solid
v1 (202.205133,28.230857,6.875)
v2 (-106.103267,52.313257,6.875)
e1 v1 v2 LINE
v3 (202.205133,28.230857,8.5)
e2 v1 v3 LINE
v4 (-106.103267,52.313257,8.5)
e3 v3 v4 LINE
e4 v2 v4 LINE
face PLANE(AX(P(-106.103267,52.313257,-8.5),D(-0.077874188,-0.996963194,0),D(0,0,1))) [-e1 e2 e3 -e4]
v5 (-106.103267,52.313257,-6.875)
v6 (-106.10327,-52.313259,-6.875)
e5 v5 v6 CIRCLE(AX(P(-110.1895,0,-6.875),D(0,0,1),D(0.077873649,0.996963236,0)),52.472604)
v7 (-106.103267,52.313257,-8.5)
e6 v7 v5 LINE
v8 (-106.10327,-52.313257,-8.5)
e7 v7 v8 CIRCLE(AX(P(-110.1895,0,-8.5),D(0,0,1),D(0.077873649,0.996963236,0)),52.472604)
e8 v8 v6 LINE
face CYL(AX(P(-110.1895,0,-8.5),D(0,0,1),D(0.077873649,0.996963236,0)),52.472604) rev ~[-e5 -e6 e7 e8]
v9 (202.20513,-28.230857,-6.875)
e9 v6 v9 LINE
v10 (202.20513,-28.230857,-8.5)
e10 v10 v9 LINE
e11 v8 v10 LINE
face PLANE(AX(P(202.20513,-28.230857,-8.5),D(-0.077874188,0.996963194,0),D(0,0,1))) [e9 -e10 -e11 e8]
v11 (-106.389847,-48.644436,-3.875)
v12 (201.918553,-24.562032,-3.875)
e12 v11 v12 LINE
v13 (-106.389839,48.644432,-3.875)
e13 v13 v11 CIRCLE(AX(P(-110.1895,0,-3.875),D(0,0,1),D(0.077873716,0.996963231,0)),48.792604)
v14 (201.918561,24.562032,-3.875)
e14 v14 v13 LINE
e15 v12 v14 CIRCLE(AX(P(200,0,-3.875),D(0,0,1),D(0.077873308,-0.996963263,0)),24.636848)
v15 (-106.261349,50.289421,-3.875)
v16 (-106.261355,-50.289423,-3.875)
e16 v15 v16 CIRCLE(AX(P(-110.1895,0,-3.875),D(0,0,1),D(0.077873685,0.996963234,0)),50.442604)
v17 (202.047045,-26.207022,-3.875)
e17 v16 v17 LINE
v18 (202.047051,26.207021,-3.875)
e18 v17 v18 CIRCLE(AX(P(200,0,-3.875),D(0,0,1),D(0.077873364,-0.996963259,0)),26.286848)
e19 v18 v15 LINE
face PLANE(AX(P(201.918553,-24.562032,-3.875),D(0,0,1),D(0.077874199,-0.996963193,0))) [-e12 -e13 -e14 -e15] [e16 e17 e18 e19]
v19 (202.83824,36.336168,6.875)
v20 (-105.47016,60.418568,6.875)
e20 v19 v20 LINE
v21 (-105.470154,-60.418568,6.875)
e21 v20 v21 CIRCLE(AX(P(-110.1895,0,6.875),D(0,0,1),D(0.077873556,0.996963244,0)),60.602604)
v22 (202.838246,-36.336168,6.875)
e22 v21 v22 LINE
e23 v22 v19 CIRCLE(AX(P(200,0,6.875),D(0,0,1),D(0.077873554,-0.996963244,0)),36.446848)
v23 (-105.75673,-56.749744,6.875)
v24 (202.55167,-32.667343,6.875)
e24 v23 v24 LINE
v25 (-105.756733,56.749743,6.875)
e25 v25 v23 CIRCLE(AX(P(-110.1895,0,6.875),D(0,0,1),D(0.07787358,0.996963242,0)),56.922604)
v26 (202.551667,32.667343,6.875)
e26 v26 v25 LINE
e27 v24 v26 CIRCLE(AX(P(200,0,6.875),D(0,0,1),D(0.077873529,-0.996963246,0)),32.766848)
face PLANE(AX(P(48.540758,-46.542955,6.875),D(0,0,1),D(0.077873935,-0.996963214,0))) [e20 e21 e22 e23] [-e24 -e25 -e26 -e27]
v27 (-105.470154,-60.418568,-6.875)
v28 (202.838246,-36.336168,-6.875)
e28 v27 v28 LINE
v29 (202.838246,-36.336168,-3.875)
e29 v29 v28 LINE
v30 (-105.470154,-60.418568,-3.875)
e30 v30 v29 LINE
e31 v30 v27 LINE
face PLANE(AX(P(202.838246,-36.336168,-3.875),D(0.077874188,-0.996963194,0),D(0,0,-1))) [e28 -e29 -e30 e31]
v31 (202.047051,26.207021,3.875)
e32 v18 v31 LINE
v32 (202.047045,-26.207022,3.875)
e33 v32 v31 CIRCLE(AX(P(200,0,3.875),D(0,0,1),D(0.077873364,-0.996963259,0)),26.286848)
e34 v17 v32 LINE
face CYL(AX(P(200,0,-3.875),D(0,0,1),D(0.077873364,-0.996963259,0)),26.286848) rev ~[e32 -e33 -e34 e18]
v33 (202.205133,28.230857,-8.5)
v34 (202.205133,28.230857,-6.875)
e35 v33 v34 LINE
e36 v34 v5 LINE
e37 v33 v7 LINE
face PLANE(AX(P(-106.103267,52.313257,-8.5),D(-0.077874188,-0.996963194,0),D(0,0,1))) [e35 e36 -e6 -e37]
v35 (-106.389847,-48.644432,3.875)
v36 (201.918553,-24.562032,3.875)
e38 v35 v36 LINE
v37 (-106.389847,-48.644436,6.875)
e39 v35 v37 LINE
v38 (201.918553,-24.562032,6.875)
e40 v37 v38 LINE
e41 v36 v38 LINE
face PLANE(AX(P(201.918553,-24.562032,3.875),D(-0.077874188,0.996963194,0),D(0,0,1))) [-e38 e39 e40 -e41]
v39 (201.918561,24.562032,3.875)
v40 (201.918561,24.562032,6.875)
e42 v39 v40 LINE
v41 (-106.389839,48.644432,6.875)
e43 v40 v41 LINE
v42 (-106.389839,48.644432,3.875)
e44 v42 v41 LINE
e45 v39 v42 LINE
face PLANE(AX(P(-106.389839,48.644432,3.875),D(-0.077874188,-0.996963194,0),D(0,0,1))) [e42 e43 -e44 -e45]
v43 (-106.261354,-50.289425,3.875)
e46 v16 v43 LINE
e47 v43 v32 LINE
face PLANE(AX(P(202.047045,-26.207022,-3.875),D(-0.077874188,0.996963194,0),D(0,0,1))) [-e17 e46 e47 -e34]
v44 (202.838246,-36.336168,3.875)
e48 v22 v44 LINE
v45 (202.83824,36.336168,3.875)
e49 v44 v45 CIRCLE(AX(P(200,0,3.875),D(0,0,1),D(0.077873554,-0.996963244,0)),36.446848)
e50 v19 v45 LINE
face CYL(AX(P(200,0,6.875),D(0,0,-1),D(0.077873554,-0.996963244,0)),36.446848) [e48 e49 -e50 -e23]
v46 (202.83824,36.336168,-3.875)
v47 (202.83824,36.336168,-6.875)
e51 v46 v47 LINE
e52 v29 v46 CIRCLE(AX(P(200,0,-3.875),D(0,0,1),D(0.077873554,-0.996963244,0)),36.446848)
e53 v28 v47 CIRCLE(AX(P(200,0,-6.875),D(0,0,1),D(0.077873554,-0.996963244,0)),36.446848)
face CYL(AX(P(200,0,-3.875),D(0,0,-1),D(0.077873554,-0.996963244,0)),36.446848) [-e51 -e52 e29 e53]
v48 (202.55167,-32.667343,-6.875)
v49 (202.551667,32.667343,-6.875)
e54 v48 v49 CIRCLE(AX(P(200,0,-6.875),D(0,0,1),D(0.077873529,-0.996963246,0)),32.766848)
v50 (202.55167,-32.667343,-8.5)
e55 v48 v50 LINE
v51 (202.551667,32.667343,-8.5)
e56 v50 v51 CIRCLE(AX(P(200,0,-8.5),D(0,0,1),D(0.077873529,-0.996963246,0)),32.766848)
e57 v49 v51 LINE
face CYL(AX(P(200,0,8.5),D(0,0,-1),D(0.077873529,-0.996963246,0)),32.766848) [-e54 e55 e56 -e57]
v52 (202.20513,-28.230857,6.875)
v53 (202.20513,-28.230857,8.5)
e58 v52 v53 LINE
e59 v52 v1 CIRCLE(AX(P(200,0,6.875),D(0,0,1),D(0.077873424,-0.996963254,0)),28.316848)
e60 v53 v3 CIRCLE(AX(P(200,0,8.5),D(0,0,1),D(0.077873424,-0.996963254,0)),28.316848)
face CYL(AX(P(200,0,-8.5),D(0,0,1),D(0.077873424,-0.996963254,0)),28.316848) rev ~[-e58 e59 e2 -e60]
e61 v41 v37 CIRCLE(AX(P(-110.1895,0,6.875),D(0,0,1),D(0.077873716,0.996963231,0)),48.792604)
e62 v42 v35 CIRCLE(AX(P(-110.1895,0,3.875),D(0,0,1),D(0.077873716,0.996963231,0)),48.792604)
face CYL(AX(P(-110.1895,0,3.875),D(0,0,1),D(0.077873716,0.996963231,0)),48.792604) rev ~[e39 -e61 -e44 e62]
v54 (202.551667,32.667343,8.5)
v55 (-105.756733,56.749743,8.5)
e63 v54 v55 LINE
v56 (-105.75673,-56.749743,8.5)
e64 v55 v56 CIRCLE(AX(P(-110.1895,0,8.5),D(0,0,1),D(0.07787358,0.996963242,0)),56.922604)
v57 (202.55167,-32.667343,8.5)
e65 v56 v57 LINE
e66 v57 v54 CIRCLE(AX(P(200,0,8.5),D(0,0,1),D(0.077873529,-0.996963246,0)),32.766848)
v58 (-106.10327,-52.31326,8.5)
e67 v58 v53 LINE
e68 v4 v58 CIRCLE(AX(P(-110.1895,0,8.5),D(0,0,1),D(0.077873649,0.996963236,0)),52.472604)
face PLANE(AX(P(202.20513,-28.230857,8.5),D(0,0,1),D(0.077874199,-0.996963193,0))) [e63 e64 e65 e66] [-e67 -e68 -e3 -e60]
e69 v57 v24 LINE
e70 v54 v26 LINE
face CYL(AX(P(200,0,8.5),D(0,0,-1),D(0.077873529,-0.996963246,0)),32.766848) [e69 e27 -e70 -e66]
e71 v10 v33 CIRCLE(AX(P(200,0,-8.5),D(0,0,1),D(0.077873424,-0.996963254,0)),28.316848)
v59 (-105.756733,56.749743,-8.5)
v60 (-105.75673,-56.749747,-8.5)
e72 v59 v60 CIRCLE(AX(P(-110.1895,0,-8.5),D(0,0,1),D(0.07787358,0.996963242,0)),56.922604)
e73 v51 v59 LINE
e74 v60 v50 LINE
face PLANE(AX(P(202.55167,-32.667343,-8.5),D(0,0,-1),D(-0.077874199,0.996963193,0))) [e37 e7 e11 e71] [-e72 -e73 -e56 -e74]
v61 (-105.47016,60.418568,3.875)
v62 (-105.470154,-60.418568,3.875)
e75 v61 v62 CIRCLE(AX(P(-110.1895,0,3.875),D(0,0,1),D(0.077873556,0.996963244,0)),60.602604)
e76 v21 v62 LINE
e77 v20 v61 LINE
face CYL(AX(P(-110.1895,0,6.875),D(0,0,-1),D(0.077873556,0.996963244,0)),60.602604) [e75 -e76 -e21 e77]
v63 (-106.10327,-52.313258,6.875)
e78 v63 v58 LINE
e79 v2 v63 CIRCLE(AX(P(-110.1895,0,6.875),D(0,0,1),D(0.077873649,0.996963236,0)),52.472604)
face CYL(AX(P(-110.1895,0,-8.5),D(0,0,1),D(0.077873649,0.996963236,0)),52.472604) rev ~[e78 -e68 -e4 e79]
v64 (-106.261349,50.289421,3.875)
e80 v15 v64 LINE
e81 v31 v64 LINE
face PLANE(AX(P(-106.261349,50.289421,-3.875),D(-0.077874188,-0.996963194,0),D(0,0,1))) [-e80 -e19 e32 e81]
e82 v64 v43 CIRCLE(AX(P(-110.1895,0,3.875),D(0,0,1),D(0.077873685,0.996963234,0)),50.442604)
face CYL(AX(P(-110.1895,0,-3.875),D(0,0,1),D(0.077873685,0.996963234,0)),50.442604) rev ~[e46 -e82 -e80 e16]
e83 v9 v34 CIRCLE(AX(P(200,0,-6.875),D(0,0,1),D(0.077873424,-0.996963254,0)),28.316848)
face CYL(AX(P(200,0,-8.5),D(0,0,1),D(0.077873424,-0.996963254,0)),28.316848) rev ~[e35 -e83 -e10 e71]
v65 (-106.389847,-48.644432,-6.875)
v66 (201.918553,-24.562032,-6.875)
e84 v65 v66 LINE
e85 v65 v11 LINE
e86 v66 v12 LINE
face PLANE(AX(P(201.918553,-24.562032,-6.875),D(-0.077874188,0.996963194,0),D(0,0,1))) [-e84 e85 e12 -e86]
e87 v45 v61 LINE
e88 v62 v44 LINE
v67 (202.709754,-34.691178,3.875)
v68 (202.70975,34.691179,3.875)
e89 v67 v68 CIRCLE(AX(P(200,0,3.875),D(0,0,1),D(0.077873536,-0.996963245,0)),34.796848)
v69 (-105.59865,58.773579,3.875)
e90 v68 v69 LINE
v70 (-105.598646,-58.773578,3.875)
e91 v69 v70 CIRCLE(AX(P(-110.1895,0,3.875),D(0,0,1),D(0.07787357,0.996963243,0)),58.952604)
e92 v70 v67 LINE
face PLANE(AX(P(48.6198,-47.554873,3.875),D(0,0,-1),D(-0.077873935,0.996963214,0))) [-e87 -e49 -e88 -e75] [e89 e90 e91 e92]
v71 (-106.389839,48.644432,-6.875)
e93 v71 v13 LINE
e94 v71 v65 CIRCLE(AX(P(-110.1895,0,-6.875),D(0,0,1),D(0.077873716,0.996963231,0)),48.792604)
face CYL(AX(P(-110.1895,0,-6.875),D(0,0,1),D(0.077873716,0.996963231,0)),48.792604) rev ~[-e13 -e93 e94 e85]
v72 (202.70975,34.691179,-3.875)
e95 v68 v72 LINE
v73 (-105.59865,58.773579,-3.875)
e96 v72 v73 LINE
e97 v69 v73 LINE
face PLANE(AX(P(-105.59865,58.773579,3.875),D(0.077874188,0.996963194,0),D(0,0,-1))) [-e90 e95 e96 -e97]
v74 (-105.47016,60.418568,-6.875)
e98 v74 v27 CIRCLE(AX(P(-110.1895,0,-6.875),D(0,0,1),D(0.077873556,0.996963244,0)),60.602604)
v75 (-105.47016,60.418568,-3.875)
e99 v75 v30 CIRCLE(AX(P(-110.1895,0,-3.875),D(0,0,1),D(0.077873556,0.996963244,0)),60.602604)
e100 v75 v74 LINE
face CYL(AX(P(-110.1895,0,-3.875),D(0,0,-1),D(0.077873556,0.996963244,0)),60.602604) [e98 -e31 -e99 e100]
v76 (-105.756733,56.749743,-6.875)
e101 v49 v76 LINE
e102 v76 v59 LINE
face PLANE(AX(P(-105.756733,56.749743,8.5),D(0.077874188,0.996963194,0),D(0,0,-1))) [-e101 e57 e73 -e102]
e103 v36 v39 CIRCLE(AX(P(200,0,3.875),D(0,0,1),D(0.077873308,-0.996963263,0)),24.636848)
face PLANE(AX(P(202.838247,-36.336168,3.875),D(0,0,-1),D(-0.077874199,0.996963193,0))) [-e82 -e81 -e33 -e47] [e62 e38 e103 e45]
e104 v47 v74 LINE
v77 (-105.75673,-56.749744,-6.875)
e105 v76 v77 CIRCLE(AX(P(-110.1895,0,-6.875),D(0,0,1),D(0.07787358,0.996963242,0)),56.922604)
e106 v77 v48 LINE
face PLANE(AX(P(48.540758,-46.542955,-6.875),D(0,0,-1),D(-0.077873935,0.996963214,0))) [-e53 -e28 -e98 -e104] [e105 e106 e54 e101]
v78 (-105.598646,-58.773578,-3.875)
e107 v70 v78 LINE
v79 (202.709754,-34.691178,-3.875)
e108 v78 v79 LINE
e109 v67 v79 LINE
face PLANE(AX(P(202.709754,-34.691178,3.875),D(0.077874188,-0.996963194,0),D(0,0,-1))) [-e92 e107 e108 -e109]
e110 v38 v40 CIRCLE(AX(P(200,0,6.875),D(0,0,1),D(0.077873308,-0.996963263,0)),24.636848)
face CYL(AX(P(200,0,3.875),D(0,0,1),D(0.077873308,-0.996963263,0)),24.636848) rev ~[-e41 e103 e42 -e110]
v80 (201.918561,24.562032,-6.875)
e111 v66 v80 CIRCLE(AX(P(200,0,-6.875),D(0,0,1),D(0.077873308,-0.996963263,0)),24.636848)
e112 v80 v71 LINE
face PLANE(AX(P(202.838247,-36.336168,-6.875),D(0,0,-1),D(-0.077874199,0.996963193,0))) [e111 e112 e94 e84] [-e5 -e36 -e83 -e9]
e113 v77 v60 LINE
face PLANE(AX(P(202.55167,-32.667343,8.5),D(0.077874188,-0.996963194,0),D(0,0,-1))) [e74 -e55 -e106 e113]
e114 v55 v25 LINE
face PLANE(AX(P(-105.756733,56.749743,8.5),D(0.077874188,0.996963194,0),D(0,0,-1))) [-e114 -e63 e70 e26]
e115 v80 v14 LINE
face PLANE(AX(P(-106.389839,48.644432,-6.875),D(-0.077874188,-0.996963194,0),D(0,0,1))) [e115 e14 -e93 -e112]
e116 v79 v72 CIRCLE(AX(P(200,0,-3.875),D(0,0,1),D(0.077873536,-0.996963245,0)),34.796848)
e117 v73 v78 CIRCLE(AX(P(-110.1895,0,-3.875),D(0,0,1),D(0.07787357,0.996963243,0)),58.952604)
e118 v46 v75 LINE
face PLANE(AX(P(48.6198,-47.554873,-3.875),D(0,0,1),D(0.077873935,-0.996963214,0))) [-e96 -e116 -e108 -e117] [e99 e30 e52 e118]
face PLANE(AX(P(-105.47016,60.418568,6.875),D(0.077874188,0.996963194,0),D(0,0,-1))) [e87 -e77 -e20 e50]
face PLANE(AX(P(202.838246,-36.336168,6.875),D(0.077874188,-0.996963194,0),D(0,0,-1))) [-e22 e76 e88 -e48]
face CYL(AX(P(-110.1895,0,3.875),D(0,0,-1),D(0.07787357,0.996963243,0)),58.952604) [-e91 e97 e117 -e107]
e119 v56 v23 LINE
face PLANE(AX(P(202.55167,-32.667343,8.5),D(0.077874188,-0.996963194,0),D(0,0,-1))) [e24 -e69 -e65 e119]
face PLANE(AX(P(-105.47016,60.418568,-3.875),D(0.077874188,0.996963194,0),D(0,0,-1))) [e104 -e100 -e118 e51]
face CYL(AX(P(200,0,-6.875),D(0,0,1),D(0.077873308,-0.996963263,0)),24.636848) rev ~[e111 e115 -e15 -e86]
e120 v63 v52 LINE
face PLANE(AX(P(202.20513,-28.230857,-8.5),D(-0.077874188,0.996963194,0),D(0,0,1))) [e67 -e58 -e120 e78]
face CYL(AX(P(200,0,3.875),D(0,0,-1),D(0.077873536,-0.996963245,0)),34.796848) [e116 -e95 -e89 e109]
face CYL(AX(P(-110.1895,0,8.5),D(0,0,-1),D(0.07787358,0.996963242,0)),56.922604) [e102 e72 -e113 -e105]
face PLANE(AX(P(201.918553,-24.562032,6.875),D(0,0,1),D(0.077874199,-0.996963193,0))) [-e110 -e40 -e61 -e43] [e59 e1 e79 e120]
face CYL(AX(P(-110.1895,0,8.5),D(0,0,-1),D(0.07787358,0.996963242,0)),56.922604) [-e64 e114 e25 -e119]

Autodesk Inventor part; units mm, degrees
ref_plane "Work Plane2" through (-110.1895, 0, 0) normal (-1, 0, 0) x (0, 0, 1)
ref_plane "Work Plane3" through (200, 0, 0) normal (-0.9782511, 0.207424, 0) x (0, 0, 1)
sketch "Path" plane through (0, 0, 0) normal (0, 0, 1) x (1, 0, 0)
  arc A0 (-105.93, 54.5315) -> (-105.93, -54.5315) centre (-110.1895, 0) ccw
  arc A1 (202.3784, -30.4491) -> (202.3784, 30.4491) centre (200, 0) ccw
  line L0 (202.3784, -30.4491) -> (-105.93, -54.5315)
  line L1 (-105.93, 54.5315) -> (202.3784, 30.4491)
  dimension "d31" = 11.81
ref_plane "Section Plane" through (-105.93, -54.5315, 0) normal (0.9969632, 0.0778742, 0) x (0, 0, 1)
sketch "Section Sketch" plane through (-105.93, -54.5315, 0) normal (0.9969632, 0.0778742, 0) x (0, 0, 1)
  line L0 (-8.5, -2.225) -> (8.5, -2.225)
  line L1 (8.5, -2.225) -> (8.5, 2.225)
  line L2 (8.5, 2.225) -> (-8.5, 2.225)
  line L3 (-8.5, 2.225) -> (-8.5, -2.225)
  line L4 (-3.875, -4.255) -> (3.875, -4.255)
  line L5 (3.875, -4.255) -> (3.875, 4.255)
  line L6 (3.875, 4.255) -> (-3.875, 4.255)
  line L7 (-3.875, 4.255) -> (-3.875, -4.255)
  line L8 (-3.875, 0) -> (3.875, 0) construction
  line L9 (-6.875, -5.905) -> (-3.875, -5.905)
  line L10 (-3.875, -5.905) -> (-3.875, 5.905)
  line L11 (-3.875, 5.905) -> (-6.875, 5.905)
  line L12 (-6.875, 5.905) -> (-6.875, -5.905)
  line L13 (3.875, -5.905) -> (6.875, -5.905)
  line L14 (6.875, -5.905) -> (6.875, 5.905)
  line L15 (6.875, 5.905) -> (3.875, 5.905)
  line L16 (3.875, 5.905) -> (3.875, -5.905)
  line L17 (-8.5, 0) -> (8.5, 0) construction
  point P0 (0, 0)
  point P1 (0, 0)
  dimension "d21" = 4.45
  dimension "d22" = 8.51
  dimension "d23" = 7.75
  dimension "d24" = 3
  dimension "d31" = 11.81
  dimension "d32" = 17
sweep "Solid" add profiles "Section Sketch" path "Path"
pattern_of_one "Strand Pattern"
equation "\"d21\" = da_d2"
equation "\"d22\" = da_d1"
equation "\"d23\" = da_b1"
equation "\"d24\" = da_t1 + da_t2"
equation "\"d30\" = da_pt"
equation "\"da_p\" = 12.7"
equation "\"da_b1\" = 7.75"
equation "\"da_h2\" = 11.81"
equation "\"da_h3\" = 10.92"
equation "\"da_d1\" = 8.51"
equation "\"da_d2\" = 4.45"
equation "\"da_pt\" = 13.92"
equation "\"da_b\" = 17"
equation "\"da_t1\" = 1.5"
equation "\"da_t2\" = 1.5"
properties part number "Roller Chain"
